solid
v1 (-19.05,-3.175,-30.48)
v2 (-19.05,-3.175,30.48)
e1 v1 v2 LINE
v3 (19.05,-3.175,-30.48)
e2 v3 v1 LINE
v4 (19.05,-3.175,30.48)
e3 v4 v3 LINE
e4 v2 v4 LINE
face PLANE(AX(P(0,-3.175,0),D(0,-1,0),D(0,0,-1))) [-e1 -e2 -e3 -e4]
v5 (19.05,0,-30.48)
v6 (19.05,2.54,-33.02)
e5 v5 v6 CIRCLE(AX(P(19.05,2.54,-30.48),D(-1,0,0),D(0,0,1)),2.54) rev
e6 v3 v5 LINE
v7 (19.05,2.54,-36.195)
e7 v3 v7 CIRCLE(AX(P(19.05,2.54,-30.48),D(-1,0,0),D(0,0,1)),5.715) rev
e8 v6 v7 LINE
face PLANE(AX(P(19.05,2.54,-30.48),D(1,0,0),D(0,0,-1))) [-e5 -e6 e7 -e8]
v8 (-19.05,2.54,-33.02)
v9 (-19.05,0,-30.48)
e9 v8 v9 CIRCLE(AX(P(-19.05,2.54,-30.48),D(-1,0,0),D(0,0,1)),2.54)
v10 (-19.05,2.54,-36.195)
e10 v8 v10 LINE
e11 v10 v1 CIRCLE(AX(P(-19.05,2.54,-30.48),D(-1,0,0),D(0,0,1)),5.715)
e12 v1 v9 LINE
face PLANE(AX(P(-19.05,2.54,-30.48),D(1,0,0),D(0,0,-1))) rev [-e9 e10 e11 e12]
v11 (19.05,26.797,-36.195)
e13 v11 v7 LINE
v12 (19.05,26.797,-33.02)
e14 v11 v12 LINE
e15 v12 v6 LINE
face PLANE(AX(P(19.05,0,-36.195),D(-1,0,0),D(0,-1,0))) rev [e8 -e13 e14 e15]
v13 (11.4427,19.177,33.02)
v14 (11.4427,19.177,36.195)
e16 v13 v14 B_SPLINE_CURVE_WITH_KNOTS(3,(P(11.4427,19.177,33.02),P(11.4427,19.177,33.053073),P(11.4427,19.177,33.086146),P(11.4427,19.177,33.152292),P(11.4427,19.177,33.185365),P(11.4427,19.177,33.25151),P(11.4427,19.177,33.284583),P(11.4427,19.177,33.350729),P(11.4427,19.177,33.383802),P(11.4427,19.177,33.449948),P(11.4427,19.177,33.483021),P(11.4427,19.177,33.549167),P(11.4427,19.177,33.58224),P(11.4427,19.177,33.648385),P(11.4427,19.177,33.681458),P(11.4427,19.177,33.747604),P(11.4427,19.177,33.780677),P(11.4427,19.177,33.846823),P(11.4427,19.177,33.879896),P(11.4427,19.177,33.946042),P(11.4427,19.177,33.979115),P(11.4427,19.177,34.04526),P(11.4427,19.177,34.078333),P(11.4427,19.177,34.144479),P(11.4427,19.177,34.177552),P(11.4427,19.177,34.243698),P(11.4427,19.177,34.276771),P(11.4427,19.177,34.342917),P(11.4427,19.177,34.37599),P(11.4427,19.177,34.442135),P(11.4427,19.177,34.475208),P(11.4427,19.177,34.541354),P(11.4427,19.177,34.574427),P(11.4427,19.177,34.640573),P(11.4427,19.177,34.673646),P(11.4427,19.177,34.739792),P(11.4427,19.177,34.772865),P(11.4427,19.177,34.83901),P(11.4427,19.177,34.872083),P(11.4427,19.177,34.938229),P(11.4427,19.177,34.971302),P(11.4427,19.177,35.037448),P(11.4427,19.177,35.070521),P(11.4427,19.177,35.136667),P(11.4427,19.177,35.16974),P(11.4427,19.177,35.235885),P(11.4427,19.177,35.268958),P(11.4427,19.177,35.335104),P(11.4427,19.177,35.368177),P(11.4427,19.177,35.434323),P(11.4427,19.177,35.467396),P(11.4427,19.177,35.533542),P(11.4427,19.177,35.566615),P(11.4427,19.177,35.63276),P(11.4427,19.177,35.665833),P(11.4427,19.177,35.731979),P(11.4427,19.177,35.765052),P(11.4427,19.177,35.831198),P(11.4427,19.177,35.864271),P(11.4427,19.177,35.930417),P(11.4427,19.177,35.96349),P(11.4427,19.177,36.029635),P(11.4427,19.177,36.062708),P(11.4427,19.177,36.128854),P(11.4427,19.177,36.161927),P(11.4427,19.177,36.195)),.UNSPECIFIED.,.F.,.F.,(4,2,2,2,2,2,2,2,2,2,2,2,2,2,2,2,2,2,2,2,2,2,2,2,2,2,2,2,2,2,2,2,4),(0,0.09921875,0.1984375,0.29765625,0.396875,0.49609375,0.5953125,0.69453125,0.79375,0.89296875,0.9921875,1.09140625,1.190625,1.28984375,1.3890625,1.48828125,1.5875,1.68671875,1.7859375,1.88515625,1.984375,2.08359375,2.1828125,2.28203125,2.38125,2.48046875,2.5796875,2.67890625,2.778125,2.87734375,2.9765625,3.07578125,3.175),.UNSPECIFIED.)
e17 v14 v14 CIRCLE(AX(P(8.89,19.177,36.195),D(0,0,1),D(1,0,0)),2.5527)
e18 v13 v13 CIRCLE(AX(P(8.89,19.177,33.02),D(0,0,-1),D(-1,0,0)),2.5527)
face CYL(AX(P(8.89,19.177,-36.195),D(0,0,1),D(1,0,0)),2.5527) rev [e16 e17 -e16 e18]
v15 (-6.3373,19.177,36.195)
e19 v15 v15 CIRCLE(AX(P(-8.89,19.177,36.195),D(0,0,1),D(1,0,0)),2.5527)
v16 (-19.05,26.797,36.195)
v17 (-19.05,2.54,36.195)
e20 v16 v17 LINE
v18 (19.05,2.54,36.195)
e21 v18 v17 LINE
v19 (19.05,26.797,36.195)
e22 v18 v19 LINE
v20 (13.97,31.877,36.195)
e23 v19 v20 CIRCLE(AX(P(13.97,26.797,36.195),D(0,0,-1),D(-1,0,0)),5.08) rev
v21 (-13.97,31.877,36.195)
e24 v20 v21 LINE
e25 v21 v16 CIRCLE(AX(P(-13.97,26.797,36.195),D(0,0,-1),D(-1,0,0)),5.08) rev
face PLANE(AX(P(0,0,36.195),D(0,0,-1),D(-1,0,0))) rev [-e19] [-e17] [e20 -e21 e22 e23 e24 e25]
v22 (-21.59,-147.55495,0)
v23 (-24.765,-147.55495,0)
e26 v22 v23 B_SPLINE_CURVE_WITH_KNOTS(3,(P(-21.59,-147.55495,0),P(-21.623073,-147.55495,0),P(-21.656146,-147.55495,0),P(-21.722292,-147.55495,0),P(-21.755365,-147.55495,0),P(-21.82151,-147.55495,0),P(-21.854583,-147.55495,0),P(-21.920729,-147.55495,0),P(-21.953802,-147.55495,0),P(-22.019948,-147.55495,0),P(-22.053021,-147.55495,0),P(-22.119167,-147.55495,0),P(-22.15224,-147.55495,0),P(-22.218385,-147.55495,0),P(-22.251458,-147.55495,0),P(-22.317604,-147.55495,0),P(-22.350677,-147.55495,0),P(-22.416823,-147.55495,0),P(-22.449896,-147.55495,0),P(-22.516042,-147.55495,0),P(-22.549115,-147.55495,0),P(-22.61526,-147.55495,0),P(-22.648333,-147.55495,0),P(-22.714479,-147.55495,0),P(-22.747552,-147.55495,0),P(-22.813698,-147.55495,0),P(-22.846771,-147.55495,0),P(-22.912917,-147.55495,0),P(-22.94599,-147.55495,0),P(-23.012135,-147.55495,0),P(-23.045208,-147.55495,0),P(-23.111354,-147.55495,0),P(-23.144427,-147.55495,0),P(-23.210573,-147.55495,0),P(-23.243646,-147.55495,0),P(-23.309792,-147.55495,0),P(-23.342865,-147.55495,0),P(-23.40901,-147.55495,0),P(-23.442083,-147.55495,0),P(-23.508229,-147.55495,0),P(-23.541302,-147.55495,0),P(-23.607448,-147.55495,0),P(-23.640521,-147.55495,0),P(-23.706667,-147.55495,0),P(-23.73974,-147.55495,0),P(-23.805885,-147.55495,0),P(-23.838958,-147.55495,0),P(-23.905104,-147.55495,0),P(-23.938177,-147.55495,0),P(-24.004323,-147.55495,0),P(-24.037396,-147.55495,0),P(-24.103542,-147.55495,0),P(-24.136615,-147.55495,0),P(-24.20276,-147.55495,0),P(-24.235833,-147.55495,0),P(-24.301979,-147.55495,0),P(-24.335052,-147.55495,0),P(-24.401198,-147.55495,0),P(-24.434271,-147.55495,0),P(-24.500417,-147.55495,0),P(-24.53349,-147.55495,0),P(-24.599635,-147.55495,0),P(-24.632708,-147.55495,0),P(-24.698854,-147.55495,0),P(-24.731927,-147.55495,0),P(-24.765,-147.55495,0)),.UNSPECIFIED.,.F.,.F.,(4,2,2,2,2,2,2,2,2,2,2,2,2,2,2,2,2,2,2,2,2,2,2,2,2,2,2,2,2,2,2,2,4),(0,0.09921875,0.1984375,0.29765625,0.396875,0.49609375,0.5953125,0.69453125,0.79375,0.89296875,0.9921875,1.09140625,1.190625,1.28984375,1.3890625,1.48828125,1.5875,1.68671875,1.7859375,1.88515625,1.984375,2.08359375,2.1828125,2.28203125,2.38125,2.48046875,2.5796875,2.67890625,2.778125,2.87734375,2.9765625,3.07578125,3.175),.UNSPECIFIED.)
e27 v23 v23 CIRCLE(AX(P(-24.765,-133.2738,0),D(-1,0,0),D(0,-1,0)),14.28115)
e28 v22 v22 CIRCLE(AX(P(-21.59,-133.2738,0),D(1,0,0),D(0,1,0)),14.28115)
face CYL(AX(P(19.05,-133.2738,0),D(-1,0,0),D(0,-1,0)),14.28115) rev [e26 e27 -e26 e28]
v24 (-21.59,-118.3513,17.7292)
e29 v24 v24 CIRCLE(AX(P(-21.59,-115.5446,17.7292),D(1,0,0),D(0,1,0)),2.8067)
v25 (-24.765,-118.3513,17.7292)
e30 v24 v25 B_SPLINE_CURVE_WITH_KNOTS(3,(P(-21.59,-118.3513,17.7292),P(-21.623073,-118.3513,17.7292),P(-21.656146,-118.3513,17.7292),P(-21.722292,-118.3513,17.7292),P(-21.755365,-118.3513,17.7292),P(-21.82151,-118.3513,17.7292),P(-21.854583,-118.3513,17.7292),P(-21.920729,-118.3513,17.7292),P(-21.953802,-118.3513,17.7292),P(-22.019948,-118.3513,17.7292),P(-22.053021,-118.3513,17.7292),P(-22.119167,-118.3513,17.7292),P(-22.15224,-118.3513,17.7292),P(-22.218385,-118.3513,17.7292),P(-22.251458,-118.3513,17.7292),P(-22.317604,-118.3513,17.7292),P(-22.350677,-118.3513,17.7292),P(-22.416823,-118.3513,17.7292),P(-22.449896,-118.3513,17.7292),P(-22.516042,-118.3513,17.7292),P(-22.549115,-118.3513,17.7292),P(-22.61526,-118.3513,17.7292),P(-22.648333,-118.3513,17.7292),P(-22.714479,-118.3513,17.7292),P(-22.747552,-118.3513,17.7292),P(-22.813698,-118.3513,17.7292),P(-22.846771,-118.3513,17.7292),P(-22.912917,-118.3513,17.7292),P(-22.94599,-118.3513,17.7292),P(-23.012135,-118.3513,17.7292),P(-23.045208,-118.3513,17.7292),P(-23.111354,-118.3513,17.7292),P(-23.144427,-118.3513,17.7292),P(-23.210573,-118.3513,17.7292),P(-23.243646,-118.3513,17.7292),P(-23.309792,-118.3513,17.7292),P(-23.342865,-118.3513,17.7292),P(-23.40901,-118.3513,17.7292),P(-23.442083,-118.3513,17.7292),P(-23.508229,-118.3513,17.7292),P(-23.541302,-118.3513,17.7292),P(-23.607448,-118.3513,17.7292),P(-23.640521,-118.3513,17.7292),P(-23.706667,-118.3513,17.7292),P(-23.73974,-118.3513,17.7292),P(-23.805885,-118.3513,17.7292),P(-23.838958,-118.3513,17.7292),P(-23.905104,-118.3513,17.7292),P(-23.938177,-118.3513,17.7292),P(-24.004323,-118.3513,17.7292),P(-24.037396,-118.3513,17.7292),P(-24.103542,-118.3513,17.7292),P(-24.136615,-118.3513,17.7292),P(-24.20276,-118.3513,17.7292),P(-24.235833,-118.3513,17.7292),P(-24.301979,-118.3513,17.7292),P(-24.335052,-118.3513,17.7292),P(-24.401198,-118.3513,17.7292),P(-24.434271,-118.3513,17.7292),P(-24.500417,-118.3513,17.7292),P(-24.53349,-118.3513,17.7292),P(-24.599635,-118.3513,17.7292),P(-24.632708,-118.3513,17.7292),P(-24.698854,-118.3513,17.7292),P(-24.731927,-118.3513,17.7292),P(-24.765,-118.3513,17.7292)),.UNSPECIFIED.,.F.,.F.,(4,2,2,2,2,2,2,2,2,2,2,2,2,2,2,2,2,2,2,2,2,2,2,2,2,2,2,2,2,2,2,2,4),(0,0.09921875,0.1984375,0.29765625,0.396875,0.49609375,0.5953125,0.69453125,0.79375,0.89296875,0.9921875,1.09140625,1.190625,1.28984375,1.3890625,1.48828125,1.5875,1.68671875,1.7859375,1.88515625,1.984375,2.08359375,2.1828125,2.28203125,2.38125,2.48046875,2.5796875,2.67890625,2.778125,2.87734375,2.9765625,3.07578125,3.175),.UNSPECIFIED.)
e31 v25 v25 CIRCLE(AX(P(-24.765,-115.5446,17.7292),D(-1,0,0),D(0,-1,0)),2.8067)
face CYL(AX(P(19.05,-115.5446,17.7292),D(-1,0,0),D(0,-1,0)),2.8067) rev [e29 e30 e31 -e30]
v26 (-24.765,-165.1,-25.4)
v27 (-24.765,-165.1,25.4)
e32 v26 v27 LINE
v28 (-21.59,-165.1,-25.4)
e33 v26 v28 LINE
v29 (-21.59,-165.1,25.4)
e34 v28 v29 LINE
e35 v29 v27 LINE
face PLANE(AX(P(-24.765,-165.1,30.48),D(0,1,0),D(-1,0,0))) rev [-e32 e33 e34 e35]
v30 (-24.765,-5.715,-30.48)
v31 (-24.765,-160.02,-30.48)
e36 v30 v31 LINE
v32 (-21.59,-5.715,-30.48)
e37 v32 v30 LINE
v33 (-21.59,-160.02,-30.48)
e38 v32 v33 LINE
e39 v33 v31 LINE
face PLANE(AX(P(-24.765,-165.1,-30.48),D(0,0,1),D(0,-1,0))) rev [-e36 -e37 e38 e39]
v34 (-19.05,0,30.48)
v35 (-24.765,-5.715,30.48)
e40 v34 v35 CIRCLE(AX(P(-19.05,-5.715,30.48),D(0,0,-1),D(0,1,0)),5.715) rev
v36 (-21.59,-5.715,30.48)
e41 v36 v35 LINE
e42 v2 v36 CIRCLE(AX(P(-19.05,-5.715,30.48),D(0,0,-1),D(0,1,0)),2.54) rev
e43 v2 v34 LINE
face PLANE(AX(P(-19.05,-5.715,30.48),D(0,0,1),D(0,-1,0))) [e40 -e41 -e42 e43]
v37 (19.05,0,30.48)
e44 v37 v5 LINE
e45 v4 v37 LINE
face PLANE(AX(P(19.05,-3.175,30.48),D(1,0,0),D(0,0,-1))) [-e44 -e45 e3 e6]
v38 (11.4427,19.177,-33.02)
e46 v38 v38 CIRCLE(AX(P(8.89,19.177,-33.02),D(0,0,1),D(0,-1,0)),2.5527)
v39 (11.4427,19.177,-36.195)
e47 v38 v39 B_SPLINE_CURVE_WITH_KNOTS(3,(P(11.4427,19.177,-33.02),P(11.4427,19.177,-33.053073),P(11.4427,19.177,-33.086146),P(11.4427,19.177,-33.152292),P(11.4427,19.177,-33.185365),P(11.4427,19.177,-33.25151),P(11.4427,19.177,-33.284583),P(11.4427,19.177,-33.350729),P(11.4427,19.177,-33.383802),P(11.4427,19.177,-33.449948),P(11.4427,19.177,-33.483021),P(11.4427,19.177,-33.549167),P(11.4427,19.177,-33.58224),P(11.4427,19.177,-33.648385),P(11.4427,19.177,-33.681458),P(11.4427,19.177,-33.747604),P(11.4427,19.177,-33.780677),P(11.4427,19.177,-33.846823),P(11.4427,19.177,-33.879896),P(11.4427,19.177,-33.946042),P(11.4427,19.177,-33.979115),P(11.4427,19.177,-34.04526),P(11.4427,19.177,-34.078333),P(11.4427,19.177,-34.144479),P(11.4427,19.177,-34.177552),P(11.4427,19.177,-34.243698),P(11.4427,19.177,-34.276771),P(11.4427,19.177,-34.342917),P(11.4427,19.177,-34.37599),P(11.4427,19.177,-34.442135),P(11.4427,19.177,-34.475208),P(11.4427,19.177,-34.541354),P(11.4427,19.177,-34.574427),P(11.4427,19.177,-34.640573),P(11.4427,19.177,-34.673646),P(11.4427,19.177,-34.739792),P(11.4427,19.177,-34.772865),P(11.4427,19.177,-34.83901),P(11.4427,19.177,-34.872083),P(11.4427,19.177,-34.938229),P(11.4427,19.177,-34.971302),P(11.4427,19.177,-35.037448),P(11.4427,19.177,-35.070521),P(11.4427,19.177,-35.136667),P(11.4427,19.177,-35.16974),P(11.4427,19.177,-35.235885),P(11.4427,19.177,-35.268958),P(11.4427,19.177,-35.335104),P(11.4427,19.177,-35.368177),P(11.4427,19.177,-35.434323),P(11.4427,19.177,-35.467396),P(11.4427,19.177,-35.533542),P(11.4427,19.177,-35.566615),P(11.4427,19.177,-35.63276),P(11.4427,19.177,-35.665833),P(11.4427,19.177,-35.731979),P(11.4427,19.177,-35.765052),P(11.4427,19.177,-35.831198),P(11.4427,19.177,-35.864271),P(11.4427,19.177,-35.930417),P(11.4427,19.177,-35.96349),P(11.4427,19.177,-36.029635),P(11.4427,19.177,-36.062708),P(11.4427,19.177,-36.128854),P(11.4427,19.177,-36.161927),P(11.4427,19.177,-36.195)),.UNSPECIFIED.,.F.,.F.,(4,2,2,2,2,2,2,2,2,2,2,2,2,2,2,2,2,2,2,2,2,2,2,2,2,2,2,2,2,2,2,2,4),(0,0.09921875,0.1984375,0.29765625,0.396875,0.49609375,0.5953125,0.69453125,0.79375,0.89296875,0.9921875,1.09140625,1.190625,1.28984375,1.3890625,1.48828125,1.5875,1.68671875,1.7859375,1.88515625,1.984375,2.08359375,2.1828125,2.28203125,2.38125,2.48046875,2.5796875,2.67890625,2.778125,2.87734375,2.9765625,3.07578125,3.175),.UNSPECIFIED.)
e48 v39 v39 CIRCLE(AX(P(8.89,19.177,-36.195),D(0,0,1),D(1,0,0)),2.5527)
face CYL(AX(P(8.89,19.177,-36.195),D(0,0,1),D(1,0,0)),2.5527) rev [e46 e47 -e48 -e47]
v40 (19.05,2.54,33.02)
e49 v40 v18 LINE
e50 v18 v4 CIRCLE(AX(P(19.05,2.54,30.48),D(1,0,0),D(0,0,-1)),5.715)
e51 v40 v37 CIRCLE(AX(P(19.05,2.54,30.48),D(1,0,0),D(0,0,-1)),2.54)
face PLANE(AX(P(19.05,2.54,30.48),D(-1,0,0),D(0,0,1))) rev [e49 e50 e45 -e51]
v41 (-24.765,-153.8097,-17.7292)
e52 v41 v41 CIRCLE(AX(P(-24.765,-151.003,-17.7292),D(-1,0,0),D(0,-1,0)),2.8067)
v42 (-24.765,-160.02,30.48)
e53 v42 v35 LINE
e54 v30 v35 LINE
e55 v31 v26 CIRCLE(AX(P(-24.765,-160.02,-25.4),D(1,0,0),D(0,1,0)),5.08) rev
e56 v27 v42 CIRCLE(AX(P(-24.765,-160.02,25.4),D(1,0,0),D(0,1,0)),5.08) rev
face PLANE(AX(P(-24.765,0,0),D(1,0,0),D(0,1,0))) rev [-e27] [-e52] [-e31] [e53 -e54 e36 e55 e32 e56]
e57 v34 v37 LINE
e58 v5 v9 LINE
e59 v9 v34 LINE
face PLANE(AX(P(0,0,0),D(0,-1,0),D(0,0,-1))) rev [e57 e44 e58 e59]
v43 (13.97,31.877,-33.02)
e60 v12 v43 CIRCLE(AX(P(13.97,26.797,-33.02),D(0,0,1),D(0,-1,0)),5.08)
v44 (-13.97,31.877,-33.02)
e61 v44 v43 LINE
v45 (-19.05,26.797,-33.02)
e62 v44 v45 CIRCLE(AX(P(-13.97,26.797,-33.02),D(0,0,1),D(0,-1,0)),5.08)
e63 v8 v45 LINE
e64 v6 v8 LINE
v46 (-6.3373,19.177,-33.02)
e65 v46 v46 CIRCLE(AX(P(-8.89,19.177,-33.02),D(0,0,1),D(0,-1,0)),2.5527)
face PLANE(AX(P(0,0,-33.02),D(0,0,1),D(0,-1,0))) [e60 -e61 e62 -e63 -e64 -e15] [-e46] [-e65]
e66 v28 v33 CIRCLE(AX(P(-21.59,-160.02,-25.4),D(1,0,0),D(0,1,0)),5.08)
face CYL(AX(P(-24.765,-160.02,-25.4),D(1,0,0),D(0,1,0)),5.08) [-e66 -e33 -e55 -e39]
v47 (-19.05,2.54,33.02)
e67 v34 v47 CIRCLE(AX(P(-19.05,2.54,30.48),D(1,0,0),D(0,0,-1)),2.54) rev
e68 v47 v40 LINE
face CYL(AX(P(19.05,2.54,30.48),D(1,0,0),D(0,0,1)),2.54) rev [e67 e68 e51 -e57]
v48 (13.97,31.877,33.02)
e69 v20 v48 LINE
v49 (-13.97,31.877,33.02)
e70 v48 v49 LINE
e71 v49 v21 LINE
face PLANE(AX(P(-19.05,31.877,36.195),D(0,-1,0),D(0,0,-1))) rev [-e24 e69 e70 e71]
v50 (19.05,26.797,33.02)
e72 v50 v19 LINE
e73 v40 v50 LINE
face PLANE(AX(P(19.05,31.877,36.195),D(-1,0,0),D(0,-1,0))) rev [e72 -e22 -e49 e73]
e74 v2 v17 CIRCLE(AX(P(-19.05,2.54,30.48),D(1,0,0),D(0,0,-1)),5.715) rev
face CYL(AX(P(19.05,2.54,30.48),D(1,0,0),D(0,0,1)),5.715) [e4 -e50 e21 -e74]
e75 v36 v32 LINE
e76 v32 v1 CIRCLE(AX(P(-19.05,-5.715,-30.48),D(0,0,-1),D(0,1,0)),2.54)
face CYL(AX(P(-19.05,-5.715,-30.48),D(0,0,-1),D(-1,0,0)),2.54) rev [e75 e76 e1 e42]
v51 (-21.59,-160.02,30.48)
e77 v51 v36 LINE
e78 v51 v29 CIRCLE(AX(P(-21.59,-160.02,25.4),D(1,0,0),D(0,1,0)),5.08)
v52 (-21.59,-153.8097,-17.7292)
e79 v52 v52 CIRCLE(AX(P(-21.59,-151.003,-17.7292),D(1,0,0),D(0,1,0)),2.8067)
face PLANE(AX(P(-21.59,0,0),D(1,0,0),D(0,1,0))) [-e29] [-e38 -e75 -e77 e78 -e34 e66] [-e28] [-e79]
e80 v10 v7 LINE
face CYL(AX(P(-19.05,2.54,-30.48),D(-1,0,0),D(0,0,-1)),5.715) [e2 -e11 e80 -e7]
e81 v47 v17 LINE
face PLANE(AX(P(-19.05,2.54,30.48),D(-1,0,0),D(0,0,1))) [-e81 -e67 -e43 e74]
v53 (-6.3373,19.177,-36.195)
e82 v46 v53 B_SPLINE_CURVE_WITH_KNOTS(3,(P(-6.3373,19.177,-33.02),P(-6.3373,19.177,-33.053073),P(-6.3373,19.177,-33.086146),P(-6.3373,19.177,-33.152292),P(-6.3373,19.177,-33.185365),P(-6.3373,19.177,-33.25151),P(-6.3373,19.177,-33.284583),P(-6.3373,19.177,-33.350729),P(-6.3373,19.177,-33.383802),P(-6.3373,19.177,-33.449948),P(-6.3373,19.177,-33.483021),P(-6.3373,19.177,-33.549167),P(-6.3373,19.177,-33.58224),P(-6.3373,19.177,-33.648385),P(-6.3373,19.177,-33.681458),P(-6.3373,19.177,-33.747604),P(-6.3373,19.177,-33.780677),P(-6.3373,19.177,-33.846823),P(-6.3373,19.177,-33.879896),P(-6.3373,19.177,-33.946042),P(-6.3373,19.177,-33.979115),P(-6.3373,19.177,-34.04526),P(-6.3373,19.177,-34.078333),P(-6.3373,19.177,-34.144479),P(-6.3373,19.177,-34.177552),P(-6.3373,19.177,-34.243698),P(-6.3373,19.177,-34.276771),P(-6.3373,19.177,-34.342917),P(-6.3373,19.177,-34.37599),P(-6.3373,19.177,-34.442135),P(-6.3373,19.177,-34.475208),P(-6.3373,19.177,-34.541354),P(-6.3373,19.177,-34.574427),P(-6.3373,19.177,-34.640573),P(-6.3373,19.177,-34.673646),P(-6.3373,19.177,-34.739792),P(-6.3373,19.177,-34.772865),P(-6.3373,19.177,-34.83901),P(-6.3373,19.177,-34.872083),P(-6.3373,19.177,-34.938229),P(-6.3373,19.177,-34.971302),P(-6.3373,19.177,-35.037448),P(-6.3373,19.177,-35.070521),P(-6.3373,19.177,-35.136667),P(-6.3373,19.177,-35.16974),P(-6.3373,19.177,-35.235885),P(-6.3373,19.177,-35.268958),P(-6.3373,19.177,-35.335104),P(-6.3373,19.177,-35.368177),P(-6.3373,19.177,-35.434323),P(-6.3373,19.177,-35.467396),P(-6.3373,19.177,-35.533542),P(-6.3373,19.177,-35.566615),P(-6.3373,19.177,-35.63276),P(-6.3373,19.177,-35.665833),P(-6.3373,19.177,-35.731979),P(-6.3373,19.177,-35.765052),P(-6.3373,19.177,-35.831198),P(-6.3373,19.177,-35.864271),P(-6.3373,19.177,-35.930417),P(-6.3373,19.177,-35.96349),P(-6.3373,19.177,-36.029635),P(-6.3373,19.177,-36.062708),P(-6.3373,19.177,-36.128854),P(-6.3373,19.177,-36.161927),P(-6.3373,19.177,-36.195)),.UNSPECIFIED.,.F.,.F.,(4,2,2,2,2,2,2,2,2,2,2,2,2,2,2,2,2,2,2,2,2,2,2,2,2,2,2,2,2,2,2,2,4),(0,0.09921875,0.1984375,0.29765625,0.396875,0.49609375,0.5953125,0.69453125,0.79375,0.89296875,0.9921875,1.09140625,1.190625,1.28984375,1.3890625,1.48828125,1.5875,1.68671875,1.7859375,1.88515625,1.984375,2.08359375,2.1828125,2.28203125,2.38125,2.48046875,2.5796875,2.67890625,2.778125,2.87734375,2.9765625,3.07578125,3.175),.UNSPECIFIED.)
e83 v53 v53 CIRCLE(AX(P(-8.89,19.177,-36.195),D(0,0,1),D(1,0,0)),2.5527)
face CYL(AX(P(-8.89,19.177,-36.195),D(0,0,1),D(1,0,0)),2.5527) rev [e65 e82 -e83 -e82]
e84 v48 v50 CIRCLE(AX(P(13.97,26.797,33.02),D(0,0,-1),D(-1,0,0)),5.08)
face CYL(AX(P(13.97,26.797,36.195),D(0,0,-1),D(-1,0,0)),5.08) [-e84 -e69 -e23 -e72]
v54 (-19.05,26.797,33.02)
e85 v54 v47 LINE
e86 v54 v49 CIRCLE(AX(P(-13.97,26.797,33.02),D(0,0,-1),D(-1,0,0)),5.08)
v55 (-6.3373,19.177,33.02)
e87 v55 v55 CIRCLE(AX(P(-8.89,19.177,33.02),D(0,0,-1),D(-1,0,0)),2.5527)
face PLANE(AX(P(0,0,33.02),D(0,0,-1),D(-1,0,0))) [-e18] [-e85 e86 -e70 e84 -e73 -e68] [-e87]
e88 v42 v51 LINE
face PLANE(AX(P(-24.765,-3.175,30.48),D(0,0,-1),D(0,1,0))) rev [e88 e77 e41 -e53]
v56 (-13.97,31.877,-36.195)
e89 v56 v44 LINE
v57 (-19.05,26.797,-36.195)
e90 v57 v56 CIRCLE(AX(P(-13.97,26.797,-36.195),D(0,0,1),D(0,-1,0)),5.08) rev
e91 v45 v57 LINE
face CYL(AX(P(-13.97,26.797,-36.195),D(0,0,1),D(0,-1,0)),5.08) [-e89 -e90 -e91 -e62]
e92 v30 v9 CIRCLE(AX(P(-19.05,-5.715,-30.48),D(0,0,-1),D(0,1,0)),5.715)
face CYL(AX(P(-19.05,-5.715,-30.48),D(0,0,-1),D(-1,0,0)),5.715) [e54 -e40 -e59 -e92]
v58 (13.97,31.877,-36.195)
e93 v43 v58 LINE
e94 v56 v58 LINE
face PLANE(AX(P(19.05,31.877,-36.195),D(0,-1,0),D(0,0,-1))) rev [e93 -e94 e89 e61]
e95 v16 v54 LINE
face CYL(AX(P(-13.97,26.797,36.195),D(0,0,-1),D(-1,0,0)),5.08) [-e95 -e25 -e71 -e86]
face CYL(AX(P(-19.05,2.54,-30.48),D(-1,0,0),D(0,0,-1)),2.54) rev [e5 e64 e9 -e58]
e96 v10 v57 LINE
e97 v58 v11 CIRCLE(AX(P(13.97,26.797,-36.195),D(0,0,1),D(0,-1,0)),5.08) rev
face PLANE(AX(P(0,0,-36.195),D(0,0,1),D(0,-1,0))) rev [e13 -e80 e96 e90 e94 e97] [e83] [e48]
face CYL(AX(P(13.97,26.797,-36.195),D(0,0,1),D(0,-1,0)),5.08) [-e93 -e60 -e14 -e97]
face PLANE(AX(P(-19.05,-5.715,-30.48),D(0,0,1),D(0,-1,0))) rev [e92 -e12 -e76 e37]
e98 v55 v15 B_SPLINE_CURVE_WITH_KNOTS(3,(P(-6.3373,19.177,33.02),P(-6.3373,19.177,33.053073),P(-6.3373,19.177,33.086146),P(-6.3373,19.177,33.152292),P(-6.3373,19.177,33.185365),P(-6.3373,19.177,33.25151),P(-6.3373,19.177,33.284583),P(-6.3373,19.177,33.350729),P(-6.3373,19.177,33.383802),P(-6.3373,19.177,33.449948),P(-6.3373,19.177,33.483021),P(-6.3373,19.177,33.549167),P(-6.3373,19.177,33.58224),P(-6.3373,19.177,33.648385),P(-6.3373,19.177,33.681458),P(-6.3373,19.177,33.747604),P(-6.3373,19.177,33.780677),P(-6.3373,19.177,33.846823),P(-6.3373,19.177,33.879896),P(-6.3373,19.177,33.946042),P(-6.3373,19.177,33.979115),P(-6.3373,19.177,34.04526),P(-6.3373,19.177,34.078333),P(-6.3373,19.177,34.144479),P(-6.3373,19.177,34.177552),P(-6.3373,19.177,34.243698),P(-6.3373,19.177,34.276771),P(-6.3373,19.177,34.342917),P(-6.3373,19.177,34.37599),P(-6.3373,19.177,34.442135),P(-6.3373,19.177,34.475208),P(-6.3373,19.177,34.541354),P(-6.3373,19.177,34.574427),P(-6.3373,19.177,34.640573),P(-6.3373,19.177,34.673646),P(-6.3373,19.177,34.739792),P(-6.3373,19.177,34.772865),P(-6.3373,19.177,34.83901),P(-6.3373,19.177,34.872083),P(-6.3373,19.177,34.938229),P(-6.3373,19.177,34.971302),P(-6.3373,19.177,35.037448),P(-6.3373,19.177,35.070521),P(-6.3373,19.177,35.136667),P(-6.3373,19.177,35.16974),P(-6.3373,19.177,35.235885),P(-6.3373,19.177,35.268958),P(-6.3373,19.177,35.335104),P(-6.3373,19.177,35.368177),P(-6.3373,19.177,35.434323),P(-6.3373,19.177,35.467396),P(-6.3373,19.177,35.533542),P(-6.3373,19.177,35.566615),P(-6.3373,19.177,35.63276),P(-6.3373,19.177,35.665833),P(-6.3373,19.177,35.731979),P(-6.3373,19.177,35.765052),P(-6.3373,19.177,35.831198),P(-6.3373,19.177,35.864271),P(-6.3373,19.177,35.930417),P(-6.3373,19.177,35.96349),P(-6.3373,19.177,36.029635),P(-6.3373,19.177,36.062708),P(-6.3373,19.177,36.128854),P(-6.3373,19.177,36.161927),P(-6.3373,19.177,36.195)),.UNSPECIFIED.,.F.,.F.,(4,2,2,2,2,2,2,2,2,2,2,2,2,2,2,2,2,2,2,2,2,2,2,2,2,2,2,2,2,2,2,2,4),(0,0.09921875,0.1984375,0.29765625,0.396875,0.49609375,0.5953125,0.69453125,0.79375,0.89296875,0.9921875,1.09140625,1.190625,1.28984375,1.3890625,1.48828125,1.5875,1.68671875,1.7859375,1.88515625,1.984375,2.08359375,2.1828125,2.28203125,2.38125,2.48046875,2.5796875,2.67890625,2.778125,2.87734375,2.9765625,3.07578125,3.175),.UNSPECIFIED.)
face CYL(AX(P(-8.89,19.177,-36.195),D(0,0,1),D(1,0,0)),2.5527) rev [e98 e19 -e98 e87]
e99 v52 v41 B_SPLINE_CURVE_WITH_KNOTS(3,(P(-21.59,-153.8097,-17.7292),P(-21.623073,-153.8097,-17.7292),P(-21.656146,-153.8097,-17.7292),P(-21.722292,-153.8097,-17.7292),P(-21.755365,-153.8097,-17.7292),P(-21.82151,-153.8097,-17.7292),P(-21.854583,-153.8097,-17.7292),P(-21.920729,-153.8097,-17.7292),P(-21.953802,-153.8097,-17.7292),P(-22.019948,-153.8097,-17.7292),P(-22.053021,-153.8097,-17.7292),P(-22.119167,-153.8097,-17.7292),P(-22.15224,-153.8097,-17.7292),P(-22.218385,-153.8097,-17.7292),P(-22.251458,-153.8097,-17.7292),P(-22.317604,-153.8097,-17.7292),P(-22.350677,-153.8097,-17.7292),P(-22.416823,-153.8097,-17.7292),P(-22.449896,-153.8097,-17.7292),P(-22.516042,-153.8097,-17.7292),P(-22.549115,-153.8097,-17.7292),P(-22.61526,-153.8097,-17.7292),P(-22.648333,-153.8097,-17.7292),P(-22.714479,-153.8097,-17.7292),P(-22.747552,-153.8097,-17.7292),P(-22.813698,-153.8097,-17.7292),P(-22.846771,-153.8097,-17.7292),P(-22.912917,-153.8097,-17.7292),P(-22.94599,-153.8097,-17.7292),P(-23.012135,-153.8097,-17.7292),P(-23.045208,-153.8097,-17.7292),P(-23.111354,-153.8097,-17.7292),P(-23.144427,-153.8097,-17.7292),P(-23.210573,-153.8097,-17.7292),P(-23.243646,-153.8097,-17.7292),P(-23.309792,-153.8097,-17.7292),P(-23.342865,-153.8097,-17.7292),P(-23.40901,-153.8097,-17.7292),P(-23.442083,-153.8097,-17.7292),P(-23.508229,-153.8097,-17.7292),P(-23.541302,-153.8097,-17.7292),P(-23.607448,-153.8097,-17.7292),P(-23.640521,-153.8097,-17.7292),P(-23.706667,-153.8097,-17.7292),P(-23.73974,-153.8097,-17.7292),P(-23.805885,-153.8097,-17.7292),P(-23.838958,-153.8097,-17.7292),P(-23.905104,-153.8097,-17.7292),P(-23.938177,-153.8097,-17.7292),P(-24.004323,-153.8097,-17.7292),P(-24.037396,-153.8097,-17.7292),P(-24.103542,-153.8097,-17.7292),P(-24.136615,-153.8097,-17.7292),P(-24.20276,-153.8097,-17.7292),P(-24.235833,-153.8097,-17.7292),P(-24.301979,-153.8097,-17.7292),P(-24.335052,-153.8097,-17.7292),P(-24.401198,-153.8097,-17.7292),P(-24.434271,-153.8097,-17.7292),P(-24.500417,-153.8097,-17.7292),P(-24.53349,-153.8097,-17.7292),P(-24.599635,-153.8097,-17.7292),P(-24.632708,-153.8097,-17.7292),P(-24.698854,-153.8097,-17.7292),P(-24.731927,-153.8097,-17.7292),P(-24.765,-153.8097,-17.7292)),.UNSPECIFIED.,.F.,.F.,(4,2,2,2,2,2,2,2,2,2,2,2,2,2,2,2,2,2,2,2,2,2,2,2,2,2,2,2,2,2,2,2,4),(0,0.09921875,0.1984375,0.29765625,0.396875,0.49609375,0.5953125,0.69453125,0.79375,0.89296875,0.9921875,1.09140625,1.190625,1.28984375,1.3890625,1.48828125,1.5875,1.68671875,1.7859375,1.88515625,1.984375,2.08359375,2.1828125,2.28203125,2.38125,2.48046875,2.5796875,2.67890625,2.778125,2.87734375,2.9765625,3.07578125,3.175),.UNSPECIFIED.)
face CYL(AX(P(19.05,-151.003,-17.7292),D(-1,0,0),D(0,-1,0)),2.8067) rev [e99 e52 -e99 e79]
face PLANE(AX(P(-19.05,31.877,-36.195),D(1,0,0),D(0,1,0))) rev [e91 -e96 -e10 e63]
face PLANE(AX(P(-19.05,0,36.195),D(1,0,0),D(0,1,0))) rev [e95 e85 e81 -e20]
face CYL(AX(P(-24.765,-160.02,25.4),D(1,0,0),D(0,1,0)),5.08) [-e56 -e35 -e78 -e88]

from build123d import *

# Parameters (mm, degrees)
SKETCH1_W               = 38.1
SKETCH1_H               = 60.96
BASE_FLANGE1_DEPTH      = 3.175
EDGE_FLANGE1_DEPTH      = 38.1
EDGE_FLANGE1_BEND_DEPTH = 38.1
EDGE_FLANGE2_DEPTH      = 60.96
SKETCH17_R              = 14.28115
SKETCH17_R_2            = 2.8067
CUT_EXTRUDE1_DEPTH      = 175.607680959
SKETCH18_R              = 2.5527
CUT_EXTRUDE2_DEPTH      = 182.96600596
FILLET1_R               = 5.08


# Sheet-metal steps are written as plain solids
with BuildPart() as part:
    # Sketch1 → Base-Flange1 (new body)
    with BuildSketch(Plane(origin=(0, 0, 0), x_dir=(1, 0, 0), z_dir=(0, 1, 0))):
        Rectangle(SKETCH1_W, SKETCH1_H)
    extrude(amount=-BASE_FLANGE1_DEPTH)

    # Edge-Flange1 section (across the edge) → Edge-Flange1 (add)
    with BuildSketch(Plane(origin=(-19.05, 0, 33.02), x_dir=(0, 0, -1), z_dir=(1, 0, 0))):
        with BuildLine():
            Line((-3.175, 2.54), (-3.175, 31.877))
            Line((-3.175, 31.877), (0, 31.877))
            Line((0, 31.877), (0, 2.54))
            ThreePointArc((0, 2.54), (0.743948776, 0.743948776), (2.54, 0))
            Line((2.54, 0), (2.54, -3.175))
            ThreePointArc((2.54, -3.175), (-1.501115254, -1.501115254), (-3.175, 2.54))
        make_face()
    extrude(amount=EDGE_FLANGE1_DEPTH)

    # Edge-Flange1 section 2 (across the edge) → Edge-Flange1 bend (add)
    with BuildSketch(Plane(origin=(19.05, 0, -33.02), x_dir=(0, 0, 1), z_dir=(-1, 0, 0))):
        with BuildLine():
            Line((-3.175, 2.54), (-3.175, 31.877))
            Line((-3.175, 31.877), (0, 31.877))
            Line((0, 31.877), (0, 2.54))
            ThreePointArc((0, 2.54), (0.743948776, 0.743948776), (2.54, 0))
            Line((2.54, 0), (2.54, -3.175))
            ThreePointArc((2.54, -3.175), (-1.501115254, -1.501115254), (-3.175, 2.54))
        make_face()
    extrude(amount=EDGE_FLANGE1_BEND_DEPTH)

    # Edge-Flange2 section (across the edge) → Edge-Flange2 (add)
    with BuildSketch(Plane(origin=(-21.59, -3.175, 30.48), x_dir=(1, 0, 0), z_dir=(0, 0, -1))):
        with BuildLine():
            Line((-3.175, 2.54), (-3.175, 161.925))
            Line((-3.175, 161.925), (0, 161.925))
            Line((0, 161.925), (0, 2.54))
            ThreePointArc((0, 2.54), (0.743948776, 0.743948776), (2.54, 0))
            Line((2.54, 0), (2.54, -3.175))
            ThreePointArc((2.54, -3.175), (-1.501115254, -1.501115254), (-3.175, 2.54))
        make_face()
    extrude(amount=EDGE_FLANGE2_DEPTH)

    # Sketch17 → Cut-Extrude1 (cut, through all)
    with BuildSketch(Plane.ZY.offset(24.765)):
        with Locations(Location((0, -133.2738, 0), (0, 0, 270))):
            Circle(SKETCH17_R)
        with Locations(Location((-17.7292, -151.003, 0), (0, 0, 270))):
            Circle(SKETCH17_R_2)
        with Locations(Location((17.7292, -115.5446, 0), (0, 0, 270))):
            Circle(SKETCH17_R_2)
    extrude(amount=-CUT_EXTRUDE1_DEPTH, mode=Mode.SUBTRACT)

    # Sketch18 → Cut-Extrude2 (cut, through all)
    with BuildSketch(Plane.XY.offset(36.195)):
        with Locations((8.89, 19.177)):
            Circle(SKETCH18_R)
        with Locations((-8.89, 19.177)):
            Circle(SKETCH18_R)
    extrude(amount=-CUT_EXTRUDE2_DEPTH, mode=Mode.SUBTRACT)

    # Fillet1
    fillet1_edges = [part.edges().sort_by_distance(p)[0] for p in [
        (-19.05, 31.877, 34.6075),
        (19.05, 31.877, 34.6075),
        (19.05, 31.877, -34.6075),
        (-19.05, 31.877, -34.6075),
        (-23.1775, -165.1, 30.48),
        (-23.1775, -165.1, -30.48),
    ]]
    fillet(fillet1_edges, radius=FILLET1_R)


solid = part.part
